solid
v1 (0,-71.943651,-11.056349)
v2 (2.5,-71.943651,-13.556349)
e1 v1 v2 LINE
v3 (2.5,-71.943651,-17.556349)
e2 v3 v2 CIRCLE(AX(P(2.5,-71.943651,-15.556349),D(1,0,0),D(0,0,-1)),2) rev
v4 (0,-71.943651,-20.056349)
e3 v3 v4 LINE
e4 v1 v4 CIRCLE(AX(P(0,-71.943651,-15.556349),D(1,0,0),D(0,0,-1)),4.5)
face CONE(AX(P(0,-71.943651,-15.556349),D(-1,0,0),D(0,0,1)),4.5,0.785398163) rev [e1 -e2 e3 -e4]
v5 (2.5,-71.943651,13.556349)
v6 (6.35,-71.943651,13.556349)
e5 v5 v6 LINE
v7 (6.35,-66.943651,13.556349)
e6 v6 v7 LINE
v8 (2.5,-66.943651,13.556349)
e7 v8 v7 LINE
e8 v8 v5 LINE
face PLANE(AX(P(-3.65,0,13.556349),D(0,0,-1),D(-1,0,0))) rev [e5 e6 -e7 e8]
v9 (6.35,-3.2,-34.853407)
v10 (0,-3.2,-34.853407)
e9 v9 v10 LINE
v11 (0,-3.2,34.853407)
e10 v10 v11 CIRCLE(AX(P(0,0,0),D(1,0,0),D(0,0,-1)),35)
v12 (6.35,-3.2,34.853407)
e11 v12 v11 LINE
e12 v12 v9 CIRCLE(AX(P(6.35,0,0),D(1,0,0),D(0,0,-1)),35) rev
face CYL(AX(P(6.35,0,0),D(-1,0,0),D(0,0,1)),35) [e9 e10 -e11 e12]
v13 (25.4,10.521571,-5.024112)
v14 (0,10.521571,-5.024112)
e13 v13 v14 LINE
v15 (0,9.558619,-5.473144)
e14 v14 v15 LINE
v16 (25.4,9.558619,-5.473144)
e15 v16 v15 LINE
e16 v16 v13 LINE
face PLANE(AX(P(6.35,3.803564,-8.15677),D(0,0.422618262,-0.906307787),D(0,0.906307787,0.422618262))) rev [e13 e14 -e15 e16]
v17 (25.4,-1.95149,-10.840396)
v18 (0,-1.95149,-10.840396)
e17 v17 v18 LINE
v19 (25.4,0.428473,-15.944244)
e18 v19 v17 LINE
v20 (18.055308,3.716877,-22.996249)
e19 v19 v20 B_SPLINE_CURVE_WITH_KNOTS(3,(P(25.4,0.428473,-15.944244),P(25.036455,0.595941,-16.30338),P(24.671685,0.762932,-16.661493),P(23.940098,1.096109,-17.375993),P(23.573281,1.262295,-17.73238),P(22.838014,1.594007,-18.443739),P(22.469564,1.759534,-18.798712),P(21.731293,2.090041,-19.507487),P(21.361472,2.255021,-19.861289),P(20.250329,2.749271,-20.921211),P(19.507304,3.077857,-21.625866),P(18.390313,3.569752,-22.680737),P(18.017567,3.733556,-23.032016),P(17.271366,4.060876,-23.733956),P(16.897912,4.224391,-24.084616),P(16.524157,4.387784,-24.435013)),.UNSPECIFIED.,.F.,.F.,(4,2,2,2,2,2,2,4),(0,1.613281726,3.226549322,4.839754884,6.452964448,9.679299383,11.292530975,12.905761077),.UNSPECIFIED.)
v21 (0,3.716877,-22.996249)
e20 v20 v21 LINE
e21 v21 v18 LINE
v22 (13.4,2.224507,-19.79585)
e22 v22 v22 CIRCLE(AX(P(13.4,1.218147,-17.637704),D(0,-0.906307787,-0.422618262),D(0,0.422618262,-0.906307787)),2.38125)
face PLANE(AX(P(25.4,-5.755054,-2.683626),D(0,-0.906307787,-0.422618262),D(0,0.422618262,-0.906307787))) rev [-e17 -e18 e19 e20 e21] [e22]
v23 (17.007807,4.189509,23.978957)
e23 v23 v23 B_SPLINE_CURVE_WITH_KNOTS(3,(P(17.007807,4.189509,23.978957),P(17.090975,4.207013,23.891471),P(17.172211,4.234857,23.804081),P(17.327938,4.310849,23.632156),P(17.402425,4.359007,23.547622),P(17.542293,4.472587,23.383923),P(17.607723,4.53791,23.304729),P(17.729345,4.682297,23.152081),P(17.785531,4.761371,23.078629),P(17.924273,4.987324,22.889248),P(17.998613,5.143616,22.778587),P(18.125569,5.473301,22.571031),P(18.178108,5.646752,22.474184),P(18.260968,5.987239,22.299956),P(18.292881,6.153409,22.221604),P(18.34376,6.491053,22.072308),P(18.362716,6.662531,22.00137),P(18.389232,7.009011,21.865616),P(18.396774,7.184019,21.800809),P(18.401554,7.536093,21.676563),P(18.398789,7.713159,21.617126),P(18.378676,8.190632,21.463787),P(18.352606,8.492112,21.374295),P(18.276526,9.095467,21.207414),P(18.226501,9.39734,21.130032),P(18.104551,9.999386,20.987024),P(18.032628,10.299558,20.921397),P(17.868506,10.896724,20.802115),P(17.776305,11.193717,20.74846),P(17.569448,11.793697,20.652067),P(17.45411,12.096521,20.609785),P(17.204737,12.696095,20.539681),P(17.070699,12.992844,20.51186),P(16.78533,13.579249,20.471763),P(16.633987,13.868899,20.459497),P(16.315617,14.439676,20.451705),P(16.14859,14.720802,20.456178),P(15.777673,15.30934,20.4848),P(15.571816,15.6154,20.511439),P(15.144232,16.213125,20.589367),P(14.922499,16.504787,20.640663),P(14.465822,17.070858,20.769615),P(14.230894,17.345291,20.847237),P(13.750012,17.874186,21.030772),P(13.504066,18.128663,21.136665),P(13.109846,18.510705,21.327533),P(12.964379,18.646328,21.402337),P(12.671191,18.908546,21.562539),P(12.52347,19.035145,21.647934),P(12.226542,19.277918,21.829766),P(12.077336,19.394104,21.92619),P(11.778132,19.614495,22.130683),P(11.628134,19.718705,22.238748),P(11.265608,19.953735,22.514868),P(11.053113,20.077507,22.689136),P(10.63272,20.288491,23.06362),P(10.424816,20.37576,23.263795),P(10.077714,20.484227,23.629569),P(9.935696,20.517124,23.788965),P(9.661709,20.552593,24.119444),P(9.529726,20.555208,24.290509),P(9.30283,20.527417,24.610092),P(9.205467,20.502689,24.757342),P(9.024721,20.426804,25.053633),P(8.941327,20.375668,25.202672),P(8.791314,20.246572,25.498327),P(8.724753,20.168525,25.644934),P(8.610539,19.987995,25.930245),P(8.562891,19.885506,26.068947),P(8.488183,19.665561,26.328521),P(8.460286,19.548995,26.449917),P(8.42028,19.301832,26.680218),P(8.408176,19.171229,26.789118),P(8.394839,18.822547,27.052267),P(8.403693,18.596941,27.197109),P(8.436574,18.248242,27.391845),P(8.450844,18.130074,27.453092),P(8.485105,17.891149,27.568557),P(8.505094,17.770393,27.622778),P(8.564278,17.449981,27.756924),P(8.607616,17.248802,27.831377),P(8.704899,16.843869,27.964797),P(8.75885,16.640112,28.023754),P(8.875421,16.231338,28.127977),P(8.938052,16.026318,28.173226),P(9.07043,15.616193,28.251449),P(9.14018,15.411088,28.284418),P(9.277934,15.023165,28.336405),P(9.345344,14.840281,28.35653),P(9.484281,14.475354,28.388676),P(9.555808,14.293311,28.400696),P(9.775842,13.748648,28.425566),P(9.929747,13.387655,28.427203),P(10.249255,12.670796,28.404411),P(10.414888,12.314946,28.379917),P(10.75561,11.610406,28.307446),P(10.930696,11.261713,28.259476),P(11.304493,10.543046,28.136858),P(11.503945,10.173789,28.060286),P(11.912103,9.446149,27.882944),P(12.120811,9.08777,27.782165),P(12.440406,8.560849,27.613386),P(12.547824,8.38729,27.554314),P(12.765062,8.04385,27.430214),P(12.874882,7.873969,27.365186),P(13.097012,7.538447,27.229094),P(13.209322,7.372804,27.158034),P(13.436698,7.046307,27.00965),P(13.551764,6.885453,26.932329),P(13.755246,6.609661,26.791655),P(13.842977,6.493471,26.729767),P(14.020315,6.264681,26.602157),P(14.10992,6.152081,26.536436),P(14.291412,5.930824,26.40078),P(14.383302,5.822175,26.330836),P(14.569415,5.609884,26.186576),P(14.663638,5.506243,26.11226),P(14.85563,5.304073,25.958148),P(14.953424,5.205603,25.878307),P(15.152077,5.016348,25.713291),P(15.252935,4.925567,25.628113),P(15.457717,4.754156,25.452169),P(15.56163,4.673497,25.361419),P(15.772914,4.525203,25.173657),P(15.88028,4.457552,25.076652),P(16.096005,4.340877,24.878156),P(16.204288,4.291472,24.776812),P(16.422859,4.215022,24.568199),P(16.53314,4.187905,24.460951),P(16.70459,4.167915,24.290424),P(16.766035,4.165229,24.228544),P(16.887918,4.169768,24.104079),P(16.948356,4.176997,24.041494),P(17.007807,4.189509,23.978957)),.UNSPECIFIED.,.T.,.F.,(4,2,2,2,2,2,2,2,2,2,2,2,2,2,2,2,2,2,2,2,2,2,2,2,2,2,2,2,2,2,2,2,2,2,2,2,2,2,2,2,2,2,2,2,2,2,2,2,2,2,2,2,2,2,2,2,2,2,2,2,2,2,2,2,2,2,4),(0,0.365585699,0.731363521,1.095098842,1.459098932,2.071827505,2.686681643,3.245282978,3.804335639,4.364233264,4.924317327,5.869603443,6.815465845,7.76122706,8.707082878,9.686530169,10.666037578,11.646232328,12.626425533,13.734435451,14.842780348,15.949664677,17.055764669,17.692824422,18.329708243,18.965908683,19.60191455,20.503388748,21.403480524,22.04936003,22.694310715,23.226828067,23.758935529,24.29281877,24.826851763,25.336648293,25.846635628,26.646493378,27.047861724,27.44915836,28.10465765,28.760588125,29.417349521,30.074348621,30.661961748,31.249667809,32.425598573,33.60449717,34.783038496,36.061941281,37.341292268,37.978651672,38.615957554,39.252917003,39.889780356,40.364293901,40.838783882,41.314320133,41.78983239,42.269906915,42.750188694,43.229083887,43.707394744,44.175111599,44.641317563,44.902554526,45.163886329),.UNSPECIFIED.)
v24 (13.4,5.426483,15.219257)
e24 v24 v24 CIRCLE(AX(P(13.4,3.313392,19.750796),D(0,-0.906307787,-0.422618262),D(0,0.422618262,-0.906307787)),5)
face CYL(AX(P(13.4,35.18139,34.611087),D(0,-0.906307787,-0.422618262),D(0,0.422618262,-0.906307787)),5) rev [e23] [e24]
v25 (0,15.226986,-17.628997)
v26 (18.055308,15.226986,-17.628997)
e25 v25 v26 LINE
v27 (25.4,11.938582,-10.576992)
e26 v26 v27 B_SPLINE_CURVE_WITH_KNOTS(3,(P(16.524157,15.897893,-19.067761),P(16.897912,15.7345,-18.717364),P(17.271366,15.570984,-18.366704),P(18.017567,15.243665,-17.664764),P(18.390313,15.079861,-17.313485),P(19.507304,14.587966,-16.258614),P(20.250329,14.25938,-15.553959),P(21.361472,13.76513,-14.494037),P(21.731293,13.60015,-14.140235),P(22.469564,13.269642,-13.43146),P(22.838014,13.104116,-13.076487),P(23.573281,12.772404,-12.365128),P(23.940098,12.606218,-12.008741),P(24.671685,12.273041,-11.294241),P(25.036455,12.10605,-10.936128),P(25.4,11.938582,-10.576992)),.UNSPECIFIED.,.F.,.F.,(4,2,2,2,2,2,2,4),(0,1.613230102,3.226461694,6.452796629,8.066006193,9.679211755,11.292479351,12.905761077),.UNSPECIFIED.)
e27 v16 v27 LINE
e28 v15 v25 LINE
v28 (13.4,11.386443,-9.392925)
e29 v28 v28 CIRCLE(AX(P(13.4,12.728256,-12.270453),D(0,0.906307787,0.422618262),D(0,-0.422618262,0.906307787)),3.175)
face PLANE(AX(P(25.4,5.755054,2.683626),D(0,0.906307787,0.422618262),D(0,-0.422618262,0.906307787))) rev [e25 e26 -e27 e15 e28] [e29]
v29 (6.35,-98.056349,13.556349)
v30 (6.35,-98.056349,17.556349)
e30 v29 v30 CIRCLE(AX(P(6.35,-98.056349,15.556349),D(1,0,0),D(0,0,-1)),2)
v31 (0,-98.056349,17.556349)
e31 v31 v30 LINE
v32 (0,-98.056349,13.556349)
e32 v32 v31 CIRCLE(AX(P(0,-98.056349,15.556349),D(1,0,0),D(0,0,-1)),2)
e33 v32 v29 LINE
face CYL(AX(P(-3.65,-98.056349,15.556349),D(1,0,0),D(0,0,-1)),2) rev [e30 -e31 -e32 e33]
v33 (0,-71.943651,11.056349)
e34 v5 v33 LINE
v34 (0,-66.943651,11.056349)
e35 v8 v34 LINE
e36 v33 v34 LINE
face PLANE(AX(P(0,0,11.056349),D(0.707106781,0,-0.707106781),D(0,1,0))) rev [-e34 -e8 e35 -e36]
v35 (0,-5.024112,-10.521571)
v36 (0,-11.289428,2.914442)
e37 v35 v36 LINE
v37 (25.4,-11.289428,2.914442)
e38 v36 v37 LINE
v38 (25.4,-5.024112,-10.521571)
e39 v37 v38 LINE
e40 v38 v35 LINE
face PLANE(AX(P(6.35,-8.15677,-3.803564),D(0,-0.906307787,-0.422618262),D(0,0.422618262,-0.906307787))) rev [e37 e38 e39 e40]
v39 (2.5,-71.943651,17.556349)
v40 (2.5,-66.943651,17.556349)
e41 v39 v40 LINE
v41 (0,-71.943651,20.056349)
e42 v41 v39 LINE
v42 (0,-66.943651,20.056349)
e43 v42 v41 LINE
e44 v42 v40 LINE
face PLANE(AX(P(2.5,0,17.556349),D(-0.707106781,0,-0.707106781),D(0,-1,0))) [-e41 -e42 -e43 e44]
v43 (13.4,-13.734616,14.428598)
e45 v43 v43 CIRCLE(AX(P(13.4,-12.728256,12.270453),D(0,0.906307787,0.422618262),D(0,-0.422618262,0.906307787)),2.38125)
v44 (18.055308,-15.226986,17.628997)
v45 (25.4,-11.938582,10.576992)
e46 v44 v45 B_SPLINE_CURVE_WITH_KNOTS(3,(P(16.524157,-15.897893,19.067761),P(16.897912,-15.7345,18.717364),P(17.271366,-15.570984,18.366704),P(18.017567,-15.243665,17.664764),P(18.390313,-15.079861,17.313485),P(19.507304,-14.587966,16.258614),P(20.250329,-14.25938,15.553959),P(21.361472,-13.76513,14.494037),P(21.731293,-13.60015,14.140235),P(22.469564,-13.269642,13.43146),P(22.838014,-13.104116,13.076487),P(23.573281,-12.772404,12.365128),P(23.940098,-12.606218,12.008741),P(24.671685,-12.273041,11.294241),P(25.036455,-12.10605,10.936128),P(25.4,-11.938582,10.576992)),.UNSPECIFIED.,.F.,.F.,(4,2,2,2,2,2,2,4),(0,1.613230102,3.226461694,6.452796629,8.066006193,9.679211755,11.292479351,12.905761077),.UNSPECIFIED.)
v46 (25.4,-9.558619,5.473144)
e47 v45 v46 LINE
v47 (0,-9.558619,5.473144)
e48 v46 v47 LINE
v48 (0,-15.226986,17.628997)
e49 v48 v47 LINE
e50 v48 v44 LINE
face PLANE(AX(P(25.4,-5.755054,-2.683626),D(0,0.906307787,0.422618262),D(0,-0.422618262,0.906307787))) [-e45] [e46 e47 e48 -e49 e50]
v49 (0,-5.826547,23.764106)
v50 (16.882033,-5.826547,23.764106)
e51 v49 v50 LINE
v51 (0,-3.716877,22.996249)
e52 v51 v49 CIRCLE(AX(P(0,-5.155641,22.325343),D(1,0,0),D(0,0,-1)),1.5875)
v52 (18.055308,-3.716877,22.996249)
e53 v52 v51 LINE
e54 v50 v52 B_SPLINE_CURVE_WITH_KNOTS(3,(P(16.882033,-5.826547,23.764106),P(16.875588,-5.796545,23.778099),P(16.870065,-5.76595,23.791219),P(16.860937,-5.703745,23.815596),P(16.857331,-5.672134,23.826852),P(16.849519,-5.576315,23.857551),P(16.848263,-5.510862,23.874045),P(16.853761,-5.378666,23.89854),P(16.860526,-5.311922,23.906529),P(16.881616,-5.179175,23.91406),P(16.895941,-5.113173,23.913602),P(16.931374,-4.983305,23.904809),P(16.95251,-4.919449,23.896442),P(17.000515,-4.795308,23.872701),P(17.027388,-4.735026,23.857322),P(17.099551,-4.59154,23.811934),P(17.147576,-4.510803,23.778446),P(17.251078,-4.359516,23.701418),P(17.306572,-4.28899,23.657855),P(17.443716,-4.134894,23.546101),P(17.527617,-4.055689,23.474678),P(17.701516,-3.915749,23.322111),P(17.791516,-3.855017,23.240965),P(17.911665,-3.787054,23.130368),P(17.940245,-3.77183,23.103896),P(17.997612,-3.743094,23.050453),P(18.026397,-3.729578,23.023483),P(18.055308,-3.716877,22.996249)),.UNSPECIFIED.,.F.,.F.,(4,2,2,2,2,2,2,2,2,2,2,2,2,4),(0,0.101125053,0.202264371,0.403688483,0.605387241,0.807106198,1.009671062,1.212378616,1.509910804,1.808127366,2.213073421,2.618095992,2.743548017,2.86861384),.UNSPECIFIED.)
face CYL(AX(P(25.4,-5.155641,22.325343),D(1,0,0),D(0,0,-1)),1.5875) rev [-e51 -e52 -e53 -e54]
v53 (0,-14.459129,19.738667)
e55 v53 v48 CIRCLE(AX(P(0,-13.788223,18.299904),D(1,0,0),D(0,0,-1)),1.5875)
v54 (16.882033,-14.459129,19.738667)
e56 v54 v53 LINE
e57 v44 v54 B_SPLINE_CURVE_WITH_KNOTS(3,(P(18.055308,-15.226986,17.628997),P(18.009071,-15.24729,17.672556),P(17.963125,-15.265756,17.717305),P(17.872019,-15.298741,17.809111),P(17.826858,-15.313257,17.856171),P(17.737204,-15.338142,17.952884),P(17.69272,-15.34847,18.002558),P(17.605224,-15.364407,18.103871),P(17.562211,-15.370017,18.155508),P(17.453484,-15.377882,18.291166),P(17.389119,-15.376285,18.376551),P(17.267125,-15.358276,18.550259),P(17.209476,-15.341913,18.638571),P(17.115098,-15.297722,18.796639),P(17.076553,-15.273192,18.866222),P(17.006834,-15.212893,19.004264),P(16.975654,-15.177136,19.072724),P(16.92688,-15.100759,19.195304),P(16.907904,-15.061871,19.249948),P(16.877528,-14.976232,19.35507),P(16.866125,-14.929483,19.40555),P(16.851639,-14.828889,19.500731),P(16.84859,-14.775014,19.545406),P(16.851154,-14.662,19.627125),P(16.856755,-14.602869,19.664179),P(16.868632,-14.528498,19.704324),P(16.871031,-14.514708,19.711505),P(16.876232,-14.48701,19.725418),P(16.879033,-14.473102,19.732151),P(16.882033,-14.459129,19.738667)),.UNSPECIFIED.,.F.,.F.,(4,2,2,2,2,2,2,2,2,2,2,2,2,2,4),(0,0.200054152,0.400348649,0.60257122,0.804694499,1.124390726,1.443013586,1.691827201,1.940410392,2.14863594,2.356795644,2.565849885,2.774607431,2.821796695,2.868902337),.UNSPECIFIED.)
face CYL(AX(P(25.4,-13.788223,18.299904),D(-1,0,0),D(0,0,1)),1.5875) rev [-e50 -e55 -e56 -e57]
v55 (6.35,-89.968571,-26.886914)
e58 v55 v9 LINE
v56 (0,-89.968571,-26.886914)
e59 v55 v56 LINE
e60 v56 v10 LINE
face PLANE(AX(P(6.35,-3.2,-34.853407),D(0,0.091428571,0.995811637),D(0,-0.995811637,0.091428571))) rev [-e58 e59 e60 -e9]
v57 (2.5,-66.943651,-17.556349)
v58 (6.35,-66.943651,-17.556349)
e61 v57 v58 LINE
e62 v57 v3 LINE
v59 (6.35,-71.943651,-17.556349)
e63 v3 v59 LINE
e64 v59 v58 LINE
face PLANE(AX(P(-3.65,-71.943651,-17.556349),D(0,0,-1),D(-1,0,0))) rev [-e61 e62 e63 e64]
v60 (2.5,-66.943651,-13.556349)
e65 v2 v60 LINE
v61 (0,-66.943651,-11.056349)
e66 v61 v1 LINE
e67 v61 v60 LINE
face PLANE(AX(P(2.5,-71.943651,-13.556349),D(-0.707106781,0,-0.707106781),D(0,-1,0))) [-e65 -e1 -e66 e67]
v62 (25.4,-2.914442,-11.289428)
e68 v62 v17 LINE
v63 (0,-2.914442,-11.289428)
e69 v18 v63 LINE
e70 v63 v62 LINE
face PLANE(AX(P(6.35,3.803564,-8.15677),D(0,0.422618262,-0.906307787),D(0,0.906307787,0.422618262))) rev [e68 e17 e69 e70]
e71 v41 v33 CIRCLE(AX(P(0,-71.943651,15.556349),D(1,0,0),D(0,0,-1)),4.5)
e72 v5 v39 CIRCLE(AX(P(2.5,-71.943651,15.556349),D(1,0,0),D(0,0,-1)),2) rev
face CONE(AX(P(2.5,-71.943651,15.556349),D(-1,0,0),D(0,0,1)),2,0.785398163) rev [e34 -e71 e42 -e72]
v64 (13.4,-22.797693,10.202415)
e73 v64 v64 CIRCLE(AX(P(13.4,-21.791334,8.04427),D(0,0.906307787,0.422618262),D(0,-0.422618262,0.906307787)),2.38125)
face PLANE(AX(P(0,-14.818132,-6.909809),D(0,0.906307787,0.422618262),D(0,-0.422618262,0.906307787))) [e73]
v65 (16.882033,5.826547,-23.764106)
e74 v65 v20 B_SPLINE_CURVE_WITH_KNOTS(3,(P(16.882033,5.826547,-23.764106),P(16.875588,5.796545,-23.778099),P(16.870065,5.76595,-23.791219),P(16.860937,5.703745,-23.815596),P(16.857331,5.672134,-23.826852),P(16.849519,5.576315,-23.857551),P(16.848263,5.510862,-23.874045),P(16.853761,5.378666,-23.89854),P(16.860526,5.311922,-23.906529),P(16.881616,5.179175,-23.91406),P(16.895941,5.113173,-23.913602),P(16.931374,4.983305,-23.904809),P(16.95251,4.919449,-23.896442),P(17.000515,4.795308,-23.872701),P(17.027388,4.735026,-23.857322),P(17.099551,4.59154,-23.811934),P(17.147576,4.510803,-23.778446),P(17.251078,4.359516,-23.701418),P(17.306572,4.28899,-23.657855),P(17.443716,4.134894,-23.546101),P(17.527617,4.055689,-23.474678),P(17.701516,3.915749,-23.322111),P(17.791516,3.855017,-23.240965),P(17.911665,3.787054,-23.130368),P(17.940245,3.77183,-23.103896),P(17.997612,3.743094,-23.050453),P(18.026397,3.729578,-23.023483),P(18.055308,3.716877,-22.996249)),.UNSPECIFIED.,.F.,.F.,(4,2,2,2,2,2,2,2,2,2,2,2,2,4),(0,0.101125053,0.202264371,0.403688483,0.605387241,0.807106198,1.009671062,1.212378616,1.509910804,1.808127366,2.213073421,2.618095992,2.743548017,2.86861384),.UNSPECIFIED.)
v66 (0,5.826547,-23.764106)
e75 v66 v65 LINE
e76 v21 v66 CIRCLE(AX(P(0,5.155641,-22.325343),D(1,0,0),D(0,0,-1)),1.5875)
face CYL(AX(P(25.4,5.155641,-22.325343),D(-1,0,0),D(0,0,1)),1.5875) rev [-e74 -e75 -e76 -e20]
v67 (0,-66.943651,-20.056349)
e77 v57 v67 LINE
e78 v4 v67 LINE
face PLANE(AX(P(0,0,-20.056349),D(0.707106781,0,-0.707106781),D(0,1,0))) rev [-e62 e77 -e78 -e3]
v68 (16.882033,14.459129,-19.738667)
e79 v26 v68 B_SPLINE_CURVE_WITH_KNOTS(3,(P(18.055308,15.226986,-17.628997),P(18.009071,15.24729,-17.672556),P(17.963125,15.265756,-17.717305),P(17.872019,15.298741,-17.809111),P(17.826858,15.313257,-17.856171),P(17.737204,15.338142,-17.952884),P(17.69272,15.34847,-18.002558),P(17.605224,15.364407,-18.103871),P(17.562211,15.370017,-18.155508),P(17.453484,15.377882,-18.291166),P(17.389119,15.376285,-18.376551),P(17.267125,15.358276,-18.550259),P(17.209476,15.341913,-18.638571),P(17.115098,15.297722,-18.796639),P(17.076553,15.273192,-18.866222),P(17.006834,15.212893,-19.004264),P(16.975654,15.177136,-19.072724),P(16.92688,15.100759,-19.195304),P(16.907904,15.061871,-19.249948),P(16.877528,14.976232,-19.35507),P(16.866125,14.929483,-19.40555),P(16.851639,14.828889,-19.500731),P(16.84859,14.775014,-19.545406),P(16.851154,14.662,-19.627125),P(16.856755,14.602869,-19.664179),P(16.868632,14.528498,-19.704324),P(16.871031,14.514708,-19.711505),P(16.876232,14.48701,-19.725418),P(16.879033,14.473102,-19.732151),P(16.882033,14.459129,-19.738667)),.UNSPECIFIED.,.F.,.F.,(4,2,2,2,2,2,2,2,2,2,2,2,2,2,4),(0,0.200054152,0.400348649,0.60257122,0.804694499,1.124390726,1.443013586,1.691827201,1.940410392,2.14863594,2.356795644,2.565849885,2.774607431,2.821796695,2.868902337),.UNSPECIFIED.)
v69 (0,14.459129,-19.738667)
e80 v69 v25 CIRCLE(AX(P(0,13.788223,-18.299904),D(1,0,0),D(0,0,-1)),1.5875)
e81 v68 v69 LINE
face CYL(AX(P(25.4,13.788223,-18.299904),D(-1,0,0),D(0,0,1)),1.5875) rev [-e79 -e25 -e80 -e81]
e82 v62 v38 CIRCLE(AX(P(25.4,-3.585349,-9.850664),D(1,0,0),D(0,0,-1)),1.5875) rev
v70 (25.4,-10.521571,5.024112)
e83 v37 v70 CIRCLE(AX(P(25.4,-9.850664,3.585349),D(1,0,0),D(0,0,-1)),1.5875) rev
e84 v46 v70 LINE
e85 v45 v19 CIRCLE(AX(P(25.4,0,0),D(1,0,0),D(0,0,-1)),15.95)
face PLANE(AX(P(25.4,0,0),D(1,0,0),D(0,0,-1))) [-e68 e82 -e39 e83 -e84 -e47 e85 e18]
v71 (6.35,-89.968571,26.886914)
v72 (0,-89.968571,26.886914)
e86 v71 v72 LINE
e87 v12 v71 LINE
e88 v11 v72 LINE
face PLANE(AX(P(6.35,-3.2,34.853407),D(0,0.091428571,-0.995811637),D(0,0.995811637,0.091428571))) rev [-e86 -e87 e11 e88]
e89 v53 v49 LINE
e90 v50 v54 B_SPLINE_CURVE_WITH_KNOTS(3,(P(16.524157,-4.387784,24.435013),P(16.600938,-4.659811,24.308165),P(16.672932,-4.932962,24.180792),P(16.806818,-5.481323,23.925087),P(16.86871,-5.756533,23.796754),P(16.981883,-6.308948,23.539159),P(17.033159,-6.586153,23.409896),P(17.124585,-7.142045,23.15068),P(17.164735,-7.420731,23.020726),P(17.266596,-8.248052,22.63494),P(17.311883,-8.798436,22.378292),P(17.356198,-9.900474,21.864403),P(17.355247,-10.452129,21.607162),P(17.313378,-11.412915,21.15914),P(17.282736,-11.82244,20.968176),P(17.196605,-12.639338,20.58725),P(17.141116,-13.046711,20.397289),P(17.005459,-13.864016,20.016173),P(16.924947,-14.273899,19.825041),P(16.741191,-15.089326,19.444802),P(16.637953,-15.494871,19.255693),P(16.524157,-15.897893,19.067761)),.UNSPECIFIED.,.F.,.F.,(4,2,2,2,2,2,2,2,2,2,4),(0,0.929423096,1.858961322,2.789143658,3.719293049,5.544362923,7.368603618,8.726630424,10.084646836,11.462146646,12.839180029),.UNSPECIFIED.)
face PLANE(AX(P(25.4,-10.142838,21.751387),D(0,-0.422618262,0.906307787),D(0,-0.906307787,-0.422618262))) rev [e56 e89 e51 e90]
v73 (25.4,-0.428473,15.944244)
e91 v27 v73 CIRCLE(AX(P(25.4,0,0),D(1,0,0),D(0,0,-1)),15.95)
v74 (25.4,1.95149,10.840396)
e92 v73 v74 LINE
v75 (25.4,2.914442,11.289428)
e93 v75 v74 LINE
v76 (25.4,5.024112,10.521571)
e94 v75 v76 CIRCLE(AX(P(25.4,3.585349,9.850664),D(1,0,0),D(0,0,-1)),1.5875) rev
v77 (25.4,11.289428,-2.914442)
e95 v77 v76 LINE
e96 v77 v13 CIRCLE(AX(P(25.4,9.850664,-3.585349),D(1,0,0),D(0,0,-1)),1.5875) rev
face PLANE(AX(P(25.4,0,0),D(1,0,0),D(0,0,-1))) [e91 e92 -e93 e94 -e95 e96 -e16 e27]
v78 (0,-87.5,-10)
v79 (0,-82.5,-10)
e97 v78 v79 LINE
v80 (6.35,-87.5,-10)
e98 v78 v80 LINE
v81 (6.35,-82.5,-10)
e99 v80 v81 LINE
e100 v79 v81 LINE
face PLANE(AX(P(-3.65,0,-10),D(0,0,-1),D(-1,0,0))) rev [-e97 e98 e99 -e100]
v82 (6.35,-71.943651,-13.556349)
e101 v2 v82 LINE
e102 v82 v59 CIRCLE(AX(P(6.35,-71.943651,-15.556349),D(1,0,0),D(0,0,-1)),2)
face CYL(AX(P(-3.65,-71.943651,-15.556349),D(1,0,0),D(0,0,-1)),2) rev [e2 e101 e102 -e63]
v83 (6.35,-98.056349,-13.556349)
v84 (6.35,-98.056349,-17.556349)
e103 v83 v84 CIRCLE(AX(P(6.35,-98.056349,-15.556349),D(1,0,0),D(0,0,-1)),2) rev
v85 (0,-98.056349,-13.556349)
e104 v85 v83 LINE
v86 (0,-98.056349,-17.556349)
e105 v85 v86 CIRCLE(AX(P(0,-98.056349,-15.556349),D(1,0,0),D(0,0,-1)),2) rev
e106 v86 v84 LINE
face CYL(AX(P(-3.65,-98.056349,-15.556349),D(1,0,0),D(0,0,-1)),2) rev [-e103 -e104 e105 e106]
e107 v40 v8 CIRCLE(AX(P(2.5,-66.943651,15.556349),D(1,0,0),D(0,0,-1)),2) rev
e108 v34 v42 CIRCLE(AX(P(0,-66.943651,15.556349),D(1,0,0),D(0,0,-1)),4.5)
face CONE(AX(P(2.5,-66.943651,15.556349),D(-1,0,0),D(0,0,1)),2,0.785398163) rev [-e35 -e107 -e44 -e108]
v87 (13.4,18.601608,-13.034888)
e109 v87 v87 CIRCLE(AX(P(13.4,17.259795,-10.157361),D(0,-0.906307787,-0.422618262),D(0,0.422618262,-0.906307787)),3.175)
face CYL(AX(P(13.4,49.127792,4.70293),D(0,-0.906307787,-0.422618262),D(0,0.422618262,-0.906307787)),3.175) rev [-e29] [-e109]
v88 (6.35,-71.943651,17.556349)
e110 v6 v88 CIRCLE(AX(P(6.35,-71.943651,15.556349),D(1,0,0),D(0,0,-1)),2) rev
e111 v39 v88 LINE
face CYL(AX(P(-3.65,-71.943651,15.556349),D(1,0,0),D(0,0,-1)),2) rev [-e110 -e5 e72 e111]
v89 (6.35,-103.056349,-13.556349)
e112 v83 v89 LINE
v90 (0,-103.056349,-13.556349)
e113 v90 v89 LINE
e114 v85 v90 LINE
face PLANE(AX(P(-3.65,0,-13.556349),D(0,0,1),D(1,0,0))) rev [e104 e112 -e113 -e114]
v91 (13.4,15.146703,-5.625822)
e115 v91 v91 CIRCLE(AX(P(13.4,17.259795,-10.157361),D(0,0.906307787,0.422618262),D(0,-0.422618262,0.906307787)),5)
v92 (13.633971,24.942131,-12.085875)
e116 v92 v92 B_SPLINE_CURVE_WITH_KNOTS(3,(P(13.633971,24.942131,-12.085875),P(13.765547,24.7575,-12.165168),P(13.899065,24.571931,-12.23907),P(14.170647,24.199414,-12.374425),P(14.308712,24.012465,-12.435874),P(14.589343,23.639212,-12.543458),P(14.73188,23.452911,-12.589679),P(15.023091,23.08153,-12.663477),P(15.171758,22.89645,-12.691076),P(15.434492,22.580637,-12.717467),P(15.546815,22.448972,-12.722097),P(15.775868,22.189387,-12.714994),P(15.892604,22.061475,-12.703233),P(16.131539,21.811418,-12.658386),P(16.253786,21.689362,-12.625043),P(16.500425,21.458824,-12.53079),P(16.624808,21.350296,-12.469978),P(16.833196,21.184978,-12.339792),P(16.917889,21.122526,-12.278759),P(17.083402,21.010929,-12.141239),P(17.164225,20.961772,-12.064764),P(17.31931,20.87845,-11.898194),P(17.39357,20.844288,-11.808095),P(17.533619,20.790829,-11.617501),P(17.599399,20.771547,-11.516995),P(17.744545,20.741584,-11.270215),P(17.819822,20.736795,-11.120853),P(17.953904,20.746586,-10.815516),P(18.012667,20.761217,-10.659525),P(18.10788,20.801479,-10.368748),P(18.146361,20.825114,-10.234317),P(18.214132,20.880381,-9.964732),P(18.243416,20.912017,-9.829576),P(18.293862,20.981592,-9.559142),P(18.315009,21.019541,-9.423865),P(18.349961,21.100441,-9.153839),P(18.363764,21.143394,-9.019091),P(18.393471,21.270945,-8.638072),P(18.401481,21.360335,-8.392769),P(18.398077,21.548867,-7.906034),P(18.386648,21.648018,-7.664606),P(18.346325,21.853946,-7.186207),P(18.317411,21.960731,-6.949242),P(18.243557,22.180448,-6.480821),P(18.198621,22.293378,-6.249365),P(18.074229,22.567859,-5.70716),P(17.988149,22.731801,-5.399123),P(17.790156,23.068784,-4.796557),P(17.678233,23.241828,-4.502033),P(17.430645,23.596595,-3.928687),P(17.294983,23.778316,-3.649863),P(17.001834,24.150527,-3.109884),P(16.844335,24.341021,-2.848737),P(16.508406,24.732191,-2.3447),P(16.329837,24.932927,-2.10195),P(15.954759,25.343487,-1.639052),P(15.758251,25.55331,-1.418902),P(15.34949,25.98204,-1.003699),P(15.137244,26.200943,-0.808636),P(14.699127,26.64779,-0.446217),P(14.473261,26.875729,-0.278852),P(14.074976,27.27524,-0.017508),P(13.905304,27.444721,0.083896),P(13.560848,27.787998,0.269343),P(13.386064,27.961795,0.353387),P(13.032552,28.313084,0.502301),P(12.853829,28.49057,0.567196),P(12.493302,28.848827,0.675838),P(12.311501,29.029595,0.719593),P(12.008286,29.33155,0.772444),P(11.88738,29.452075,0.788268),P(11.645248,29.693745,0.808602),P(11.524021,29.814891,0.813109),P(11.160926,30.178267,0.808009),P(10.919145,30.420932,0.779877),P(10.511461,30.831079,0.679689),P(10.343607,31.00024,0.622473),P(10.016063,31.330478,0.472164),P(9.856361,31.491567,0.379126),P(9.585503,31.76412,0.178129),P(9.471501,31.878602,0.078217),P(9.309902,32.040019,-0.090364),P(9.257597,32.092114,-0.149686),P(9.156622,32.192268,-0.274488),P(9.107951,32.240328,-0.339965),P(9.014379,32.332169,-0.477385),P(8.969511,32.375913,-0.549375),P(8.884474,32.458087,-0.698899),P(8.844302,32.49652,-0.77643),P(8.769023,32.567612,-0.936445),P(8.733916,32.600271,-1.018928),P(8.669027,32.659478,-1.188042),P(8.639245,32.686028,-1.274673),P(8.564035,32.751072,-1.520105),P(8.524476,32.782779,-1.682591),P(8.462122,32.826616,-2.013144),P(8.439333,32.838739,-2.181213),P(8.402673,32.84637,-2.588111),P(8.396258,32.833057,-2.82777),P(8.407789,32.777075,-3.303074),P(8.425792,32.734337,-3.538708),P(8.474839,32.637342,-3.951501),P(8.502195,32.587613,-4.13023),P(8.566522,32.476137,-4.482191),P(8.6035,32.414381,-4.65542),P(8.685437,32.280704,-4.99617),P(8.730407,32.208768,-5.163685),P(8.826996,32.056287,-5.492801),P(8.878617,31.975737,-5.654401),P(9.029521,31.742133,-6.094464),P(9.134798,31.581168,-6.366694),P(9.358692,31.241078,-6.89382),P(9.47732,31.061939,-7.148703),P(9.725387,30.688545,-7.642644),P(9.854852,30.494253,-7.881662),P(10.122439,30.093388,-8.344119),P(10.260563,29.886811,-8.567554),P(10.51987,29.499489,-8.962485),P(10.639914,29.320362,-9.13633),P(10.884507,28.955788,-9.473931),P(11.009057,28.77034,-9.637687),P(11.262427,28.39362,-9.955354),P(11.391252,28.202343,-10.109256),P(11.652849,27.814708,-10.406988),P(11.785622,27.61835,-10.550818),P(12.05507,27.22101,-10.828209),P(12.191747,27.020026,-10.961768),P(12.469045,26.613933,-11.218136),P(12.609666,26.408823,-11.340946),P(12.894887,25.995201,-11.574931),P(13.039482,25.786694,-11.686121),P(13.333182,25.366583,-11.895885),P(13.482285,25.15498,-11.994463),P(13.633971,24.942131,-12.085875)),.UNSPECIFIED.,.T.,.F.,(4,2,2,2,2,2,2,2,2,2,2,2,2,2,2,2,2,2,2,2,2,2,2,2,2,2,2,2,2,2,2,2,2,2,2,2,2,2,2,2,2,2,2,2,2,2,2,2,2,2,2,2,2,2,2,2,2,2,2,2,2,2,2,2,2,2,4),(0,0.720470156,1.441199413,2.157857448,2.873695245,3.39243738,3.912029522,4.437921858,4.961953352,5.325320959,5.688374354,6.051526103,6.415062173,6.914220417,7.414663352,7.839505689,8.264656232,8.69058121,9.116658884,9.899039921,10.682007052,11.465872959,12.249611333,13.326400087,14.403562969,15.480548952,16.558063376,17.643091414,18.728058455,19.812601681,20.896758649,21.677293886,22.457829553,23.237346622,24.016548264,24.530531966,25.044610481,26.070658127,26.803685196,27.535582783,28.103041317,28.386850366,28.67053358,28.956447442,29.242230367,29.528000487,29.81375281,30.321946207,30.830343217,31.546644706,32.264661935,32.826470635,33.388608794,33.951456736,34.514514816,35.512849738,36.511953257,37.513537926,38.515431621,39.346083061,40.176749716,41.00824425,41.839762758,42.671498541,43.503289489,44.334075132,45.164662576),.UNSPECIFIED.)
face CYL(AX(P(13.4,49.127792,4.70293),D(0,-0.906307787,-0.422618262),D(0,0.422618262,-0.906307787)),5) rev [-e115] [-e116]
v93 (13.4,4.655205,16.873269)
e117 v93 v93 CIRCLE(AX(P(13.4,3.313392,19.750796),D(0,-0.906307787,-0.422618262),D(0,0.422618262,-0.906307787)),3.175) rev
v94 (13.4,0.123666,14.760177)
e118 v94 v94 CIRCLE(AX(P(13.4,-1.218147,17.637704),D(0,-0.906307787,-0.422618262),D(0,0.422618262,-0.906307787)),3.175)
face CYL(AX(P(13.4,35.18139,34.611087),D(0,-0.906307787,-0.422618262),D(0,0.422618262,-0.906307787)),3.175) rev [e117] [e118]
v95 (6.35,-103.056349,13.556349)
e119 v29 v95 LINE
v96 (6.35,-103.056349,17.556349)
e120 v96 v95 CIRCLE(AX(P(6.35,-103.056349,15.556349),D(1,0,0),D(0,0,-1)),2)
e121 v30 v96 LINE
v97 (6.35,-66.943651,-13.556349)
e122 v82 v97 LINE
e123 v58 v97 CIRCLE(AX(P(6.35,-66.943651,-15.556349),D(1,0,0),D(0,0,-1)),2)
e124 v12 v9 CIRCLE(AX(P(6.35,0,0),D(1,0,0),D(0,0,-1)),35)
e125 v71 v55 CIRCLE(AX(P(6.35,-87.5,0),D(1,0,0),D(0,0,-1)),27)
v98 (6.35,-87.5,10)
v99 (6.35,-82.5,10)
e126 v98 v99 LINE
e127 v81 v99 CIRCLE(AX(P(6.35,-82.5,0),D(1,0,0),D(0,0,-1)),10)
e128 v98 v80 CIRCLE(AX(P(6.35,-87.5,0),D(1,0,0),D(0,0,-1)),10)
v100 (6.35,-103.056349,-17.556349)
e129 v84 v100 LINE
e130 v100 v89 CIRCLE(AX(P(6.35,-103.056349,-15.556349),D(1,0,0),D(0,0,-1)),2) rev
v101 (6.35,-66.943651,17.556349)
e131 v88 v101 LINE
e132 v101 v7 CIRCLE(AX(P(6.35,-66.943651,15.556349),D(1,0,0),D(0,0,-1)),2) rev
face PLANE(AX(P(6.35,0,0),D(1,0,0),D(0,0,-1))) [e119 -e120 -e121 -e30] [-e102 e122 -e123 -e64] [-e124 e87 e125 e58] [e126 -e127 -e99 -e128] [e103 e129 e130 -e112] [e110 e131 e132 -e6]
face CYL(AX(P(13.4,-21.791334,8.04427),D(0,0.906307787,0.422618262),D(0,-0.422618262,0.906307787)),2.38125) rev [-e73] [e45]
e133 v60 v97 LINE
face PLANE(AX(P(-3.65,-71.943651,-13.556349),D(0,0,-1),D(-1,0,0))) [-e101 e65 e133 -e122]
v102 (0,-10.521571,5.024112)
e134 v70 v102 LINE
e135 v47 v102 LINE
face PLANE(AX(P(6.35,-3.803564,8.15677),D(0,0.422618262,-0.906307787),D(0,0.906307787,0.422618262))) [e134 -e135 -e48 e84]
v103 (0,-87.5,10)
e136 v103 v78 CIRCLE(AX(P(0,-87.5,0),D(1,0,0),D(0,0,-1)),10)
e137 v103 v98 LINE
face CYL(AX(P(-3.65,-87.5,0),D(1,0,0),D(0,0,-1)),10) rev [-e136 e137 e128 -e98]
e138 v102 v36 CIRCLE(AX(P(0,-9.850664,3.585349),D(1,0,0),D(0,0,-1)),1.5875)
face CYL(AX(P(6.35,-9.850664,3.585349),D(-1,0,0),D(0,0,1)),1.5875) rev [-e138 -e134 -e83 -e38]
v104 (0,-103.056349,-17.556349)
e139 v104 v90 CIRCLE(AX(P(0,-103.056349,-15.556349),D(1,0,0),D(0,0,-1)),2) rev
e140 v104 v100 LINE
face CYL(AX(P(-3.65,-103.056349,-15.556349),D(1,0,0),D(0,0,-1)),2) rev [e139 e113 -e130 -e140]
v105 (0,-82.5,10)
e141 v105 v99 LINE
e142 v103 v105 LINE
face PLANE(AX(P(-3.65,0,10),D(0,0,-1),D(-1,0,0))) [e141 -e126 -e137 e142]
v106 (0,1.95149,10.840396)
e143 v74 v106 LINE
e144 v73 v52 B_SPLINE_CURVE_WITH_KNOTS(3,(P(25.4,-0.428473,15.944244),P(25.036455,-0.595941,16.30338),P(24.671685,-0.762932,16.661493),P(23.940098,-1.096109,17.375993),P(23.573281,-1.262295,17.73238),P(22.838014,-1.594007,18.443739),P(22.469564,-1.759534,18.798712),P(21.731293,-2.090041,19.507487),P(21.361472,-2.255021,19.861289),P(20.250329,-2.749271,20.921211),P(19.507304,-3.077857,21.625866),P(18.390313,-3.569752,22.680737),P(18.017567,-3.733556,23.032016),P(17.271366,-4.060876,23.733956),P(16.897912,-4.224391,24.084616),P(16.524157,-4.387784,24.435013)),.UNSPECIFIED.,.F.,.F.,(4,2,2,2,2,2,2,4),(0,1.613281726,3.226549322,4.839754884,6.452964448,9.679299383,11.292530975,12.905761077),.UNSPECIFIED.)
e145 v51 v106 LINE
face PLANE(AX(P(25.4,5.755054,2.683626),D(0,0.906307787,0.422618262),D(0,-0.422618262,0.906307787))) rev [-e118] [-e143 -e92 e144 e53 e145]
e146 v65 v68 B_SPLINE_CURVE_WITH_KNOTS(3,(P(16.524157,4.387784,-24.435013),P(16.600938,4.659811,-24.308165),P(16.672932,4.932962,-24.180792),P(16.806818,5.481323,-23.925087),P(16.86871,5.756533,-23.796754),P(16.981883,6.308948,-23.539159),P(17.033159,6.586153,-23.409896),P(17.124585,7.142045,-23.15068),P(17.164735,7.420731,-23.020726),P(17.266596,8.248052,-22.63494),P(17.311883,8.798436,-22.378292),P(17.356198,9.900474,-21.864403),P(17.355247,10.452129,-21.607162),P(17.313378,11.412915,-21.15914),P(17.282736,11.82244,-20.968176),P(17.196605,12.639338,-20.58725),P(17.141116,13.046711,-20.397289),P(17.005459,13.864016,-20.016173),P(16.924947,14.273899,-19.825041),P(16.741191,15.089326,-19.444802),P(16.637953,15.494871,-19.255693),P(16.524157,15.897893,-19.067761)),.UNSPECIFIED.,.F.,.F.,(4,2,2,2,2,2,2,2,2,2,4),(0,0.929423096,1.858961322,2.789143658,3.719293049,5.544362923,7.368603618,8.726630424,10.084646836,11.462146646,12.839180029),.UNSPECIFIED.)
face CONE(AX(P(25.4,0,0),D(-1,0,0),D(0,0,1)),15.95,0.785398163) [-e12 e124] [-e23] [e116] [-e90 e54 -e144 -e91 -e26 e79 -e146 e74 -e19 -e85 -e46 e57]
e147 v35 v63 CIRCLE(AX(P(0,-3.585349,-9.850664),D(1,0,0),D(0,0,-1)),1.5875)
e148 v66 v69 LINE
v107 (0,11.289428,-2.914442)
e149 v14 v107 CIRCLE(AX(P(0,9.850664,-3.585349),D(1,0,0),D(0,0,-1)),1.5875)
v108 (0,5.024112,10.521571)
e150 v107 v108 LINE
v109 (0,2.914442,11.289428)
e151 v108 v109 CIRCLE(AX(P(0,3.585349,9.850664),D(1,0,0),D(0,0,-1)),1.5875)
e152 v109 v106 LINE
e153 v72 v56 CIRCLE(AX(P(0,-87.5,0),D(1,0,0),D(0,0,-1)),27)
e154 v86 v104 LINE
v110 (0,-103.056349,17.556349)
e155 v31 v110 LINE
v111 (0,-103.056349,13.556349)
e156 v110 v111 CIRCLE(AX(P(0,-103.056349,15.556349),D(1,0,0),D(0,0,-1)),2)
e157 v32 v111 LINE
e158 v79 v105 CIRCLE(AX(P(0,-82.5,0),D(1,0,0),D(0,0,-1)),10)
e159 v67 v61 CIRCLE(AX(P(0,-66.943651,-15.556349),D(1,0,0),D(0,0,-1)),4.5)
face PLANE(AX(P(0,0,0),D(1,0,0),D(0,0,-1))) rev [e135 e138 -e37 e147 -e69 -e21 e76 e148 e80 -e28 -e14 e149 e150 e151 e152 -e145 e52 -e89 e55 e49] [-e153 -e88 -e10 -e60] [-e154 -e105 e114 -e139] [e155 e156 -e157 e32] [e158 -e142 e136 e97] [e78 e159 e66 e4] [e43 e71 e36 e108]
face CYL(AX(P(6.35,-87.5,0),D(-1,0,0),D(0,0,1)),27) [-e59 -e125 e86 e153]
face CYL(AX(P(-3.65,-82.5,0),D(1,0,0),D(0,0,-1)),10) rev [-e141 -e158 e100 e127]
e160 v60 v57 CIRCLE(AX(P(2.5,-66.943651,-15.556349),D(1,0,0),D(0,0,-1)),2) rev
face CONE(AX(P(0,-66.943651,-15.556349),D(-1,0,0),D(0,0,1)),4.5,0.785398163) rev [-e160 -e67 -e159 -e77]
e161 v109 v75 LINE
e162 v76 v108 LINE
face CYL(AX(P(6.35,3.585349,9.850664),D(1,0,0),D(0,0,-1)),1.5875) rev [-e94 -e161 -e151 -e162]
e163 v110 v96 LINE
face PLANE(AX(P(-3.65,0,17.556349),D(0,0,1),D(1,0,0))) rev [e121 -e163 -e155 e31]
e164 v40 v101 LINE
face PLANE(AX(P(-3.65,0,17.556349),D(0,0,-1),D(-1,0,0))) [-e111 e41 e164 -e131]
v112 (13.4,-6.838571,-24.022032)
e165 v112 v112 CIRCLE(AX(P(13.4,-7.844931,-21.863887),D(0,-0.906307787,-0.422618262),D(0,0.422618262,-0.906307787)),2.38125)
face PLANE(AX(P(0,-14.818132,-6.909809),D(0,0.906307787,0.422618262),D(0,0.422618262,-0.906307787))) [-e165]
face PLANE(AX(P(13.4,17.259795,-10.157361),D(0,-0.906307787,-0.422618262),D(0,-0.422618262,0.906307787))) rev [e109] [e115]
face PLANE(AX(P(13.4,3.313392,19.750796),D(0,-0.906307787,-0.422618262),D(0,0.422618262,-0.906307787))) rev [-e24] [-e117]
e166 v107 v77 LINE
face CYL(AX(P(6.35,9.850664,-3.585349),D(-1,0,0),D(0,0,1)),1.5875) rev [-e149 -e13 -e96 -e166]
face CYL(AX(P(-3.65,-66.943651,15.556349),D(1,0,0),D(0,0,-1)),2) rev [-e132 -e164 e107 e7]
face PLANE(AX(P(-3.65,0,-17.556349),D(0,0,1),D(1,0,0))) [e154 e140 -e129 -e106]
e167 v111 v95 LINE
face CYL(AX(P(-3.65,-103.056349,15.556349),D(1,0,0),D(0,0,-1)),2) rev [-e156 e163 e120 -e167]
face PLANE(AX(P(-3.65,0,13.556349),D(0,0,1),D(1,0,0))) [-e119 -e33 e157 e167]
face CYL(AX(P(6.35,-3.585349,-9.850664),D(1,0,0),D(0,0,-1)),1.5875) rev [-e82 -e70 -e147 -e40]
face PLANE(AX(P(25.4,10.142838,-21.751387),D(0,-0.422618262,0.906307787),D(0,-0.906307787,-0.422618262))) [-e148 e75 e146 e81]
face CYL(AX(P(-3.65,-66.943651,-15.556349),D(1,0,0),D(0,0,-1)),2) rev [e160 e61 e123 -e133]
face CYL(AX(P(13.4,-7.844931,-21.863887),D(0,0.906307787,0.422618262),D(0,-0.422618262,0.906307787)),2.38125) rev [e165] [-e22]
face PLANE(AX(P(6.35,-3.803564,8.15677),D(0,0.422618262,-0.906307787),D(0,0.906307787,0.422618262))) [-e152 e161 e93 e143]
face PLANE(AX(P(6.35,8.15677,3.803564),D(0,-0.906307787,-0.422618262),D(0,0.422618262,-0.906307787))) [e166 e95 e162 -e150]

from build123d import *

# Parameters (mm, degrees)
BOSS_EXTRUDE1_DEPTH = 6.35
SKETCH20_R          = 35
BOSS_EXTRUDE5_DEPTH = 19.05
CUT_EXTRUDE14_DEPTH = 123.39448517
CHAMFER1_SIZE       = 19.05
SKETCH22_R          = 3.175
CUT_EXTRUDE15_DEPTH = 129.555411344
SKETCH24_R          = 5
CUT_EXTRUDE16_DEPTH = 134.419011414
SKETCH25_R          = 2.38125
CUT_EXTRUDE17_DEPTH = 10
CUT_EXTRUDE18_DEPTH = 10
CHAMFER2_SIZE       = 2.5
FILLET1_R           = 1.5875


with BuildPart() as part:
    # Sketch1 → Boss-Extrude1 (new body)
    with BuildSketch(Plane(origin=(0, 0, 0), x_dir=(0, 0, -1), z_dir=(1, 0, 0))):
        with BuildLine():
            Line((-34.853407294, -3.2), (-26.886914198, -89.968571429))
            ThreePointArc((-26.886914198, -89.968571429), (0, -114.5), (26.886914198, -89.968571429))
            Line((26.886914198, -89.968571429), (34.853407294, -3.2))
            ThreePointArc((34.853407294, -3.2), (0, 35), (-34.853407294, -3.2))
        make_face()
        Polygon((4.353205728, 11.960334439), (-11.960334439, 4.353205728), (-4.353205728, -11.960334439), (11.960334439, -4.353205728), align=None, mode=Mode.SUBTRACT)
    extrude(amount=BOSS_EXTRUDE1_DEPTH)

    # Sketch20 → Boss-Extrude5 (add)
    with BuildSketch(Plane(origin=(6.35, 0, 0), x_dir=(0, 0, -1), z_dir=(1, 0, 0))):
        with Locations(Location((0, 0, 0), (0, 0, 185.245797084))):
            Circle(SKETCH20_R)
    extrude(amount=BOSS_EXTRUDE5_DEPTH)

    # Sketch21 → Cut-Extrude14 (cut, through all)
    with BuildSketch(Plane.ZY):
        Polygon((-19.067760927, 15.897892729), (-24.435012851, 4.387783834), (-10.840396045, -1.951490092), (-5.473144121, 9.558618803), align=None)
        Polygon((-11.960334439, -4.353205728), (-4.353205728, 11.960334439), (11.960334439, 4.353205728), (4.353205728, -11.960334439), align=None)
        Polygon((10.840396045, 1.951490092), (5.473144121, -9.558618803), (19.067760927, -15.897892729), (24.435012851, -4.387783834), align=None)
    extrude(amount=-CUT_EXTRUDE14_DEPTH, mode=Mode.SUBTRACT)

    # Chamfer1
    # the kernel refuses this chamfer: 19.05 mm, written as the material it takes off along each edge
    with BuildSketch(Plane(origin=(25.4, 0, 0), x_dir=(0, -0.09142857142327497, 0.9958116369713196), z_dir=(0, 0.9958116369713196, 0.09142857142327497))) as chamfer1_piece_1:
        Polygon((35 - CHAMFER1_SIZE, 0), (35, -CHAMFER1_SIZE), (35, 0), align=None)
    revolve(axis=Axis((25.4, 0, 0), (1, 0, 0)), mode=Mode.SUBTRACT)

    # Sketch22 → Cut-Extrude15 (cut, through all)
    with BuildSketch(Plane(origin=(0, 5.755054448, 2.683625962), x_dir=(-1, 0, 0), z_dir=(0, -0.9063077870366495, -0.4226182617407006))):
        with Locations(Location((-13.4, -16.5, 0), (0, 0, 90))):
            Circle(SKETCH22_R)
    cut_extrude15 = extrude(amount=-CUT_EXTRUDE15_DEPTH, mode=Mode.SUBTRACT)

    # Sketch24 → Cut-Extrude16 (cut, through all)
    with BuildSketch(Plane(origin=(0, 10.286593383, 4.796717271), x_dir=(-1, 0, 0), z_dir=(0, -0.9063077870366495, -0.4226182617407006))):
        with Locations(Location((-13.4, -16.5, 0), (0, 0, 90))):
            Circle(SKETCH24_R)
    cut_extrude16 = extrude(amount=-CUT_EXTRUDE16_DEPTH, mode=Mode.SUBTRACT)

    # Sketch25 → Cut-Extrude17 (cut)
    with BuildSketch(Plane(origin=(0, -5.755054448, -2.683625962), x_dir=(1, 0, 0), z_dir=(0, 0.9063077870366495, 0.4226182617407006))):
        with Locations(Location((13.4, -16.5, 0), (0, 0, 270))):
            Circle(SKETCH25_R)
    cut_extrude17 = extrude(amount=-CUT_EXTRUDE17_DEPTH, mode=Mode.SUBTRACT)

    # Mirror1: Cut-Extrude15, Cut-Extrude16, Cut-Extrude17 across plane
    add(cut_extrude15.mirror(Plane(origin=(0, 0, 0), x_dir=(1, 0, 0), z_dir=(0, 0.42261826174070105, -0.9063077870366493))), mode=Mode.SUBTRACT)
    add(cut_extrude16.mirror(Plane(origin=(0, 0, 0), x_dir=(1, 0, 0), z_dir=(0, 0.42261826174070105, -0.9063077870366493))), mode=Mode.SUBTRACT)
    add(cut_extrude17.mirror(Plane(origin=(0, 0, 0), x_dir=(1, 0, 0), z_dir=(0, 0.42261826174070105, -0.9063077870366493))), mode=Mode.SUBTRACT)

    # Sketch19 → Cut-Extrude18 (cut)
    with BuildSketch(Plane(origin=(6.35, 0, 0), x_dir=(0, 0, -1), z_dir=(1, 0, 0))):
        with BuildLine():
            Line((13.556349186, -66.943650814), (13.556349186, -71.943650814))
            ThreePointArc((13.556349186, -71.943650814), (15.556349186, -73.943650814), (17.556349186, -71.943650814))
            Line((17.556349186, -71.943650814), (17.556349186, -66.943650814))
            ThreePointArc((17.556349186, -66.943650814), (15.556349186, -64.943650814), (13.556349186, -66.943650814))
        make_face()
        with BuildLine():
            Line((-10, -82.5), (-10, -87.5))
            ThreePointArc((-10, -87.5), (0, -97.5), (10, -87.5))
            Line((10, -87.5), (10, -82.5))
            ThreePointArc((10, -82.5), (0, -72.5), (-10, -82.5))
        make_face()
        with BuildLine():
            Line((17.556349186, -103.056349186), (17.556349186, -98.056349186))
            ThreePointArc((17.556349186, -98.056349186), (15.556349186, -96.056349186), (13.556349186, -98.056349186))
            Line((13.556349186, -98.056349186), (13.556349186, -103.056349186))
            ThreePointArc((13.556349186, -103.056349186), (15.556349186, -105.056349186), (17.556349186, -103.056349186))
        make_face()
        with BuildLine():
            Line((-17.556349186, -66.943650814), (-17.556349186, -71.943650814))
            ThreePointArc((-17.556349186, -71.943650814), (-15.556349186, -73.943650814), (-13.556349186, -71.943650814))
            Line((-13.556349186, -71.943650814), (-13.556349186, -66.943650814))
            ThreePointArc((-13.556349186, -66.943650814), (-15.556349186, -64.943650814), (-17.556349186, -66.943650814))
        make_face()
        with BuildLine():
            Line((-13.556349186, -103.056349186), (-13.556349186, -98.056349186))
            ThreePointArc((-13.556349186, -98.056349186), (-15.556349186, -96.056349186), (-17.556349186, -98.056349186))
            Line((-17.556349186, -98.056349186), (-17.556349186, -103.056349186))
            ThreePointArc((-17.556349186, -103.056349186), (-15.556349186, -105.056349186), (-13.556349186, -103.056349186))
        make_face()
    extrude(amount=-CUT_EXTRUDE18_DEPTH, mode=Mode.SUBTRACT)


with BuildPart() as body_2:
    # Mirror2: mirrored copy
    add(part.part.mirror(Plane(origin=(0, 0, 0), x_dir=(0, 0, 1), z_dir=(1, 0, 0))))


with BuildPart() as part_1:
    add(part.part)

    # Chamfer2
    chamfer2_edges = [part_1.edges().sort_by_distance(p)[0] for p in [
        (0, -69.443650814, 13.556349186),
        (0, -64.943650814, 15.556349186),
        (0, -69.443650814, 17.556349186),
        (0, -73.943650814, 15.556349186),
        (0, -69.443650814, -17.556349186),
        (0, -64.943650814, -15.556349186),
        (0, -69.443650814, -13.556349186),
        (0, -73.943650814, -15.556349186),
    ]]
    chamfer(chamfer2_edges, length=CHAMFER2_SIZE)

    # Fillet1
    fillet1_edges = [part_1.edges().sort_by_distance(p)[0] for p in [
        (12.7, -4.353205728, -11.960334439),
        (8.262078305, 4.387783834, -24.435012851),
        (12.7, 11.960334439, -4.353205728),
        (8.262078305, 15.897892729, -19.067760927),
        (8.262078305, -4.387783834, 24.435012851),
        (12.7, 4.353205728, 11.960334439),
        (12.7, -11.960334439, 4.353205728),
        (8.262078305, -15.897892729, 19.067760927),
    ]]
    fillet(fillet1_edges, radius=FILLET1_R)


solid = part_1.part
